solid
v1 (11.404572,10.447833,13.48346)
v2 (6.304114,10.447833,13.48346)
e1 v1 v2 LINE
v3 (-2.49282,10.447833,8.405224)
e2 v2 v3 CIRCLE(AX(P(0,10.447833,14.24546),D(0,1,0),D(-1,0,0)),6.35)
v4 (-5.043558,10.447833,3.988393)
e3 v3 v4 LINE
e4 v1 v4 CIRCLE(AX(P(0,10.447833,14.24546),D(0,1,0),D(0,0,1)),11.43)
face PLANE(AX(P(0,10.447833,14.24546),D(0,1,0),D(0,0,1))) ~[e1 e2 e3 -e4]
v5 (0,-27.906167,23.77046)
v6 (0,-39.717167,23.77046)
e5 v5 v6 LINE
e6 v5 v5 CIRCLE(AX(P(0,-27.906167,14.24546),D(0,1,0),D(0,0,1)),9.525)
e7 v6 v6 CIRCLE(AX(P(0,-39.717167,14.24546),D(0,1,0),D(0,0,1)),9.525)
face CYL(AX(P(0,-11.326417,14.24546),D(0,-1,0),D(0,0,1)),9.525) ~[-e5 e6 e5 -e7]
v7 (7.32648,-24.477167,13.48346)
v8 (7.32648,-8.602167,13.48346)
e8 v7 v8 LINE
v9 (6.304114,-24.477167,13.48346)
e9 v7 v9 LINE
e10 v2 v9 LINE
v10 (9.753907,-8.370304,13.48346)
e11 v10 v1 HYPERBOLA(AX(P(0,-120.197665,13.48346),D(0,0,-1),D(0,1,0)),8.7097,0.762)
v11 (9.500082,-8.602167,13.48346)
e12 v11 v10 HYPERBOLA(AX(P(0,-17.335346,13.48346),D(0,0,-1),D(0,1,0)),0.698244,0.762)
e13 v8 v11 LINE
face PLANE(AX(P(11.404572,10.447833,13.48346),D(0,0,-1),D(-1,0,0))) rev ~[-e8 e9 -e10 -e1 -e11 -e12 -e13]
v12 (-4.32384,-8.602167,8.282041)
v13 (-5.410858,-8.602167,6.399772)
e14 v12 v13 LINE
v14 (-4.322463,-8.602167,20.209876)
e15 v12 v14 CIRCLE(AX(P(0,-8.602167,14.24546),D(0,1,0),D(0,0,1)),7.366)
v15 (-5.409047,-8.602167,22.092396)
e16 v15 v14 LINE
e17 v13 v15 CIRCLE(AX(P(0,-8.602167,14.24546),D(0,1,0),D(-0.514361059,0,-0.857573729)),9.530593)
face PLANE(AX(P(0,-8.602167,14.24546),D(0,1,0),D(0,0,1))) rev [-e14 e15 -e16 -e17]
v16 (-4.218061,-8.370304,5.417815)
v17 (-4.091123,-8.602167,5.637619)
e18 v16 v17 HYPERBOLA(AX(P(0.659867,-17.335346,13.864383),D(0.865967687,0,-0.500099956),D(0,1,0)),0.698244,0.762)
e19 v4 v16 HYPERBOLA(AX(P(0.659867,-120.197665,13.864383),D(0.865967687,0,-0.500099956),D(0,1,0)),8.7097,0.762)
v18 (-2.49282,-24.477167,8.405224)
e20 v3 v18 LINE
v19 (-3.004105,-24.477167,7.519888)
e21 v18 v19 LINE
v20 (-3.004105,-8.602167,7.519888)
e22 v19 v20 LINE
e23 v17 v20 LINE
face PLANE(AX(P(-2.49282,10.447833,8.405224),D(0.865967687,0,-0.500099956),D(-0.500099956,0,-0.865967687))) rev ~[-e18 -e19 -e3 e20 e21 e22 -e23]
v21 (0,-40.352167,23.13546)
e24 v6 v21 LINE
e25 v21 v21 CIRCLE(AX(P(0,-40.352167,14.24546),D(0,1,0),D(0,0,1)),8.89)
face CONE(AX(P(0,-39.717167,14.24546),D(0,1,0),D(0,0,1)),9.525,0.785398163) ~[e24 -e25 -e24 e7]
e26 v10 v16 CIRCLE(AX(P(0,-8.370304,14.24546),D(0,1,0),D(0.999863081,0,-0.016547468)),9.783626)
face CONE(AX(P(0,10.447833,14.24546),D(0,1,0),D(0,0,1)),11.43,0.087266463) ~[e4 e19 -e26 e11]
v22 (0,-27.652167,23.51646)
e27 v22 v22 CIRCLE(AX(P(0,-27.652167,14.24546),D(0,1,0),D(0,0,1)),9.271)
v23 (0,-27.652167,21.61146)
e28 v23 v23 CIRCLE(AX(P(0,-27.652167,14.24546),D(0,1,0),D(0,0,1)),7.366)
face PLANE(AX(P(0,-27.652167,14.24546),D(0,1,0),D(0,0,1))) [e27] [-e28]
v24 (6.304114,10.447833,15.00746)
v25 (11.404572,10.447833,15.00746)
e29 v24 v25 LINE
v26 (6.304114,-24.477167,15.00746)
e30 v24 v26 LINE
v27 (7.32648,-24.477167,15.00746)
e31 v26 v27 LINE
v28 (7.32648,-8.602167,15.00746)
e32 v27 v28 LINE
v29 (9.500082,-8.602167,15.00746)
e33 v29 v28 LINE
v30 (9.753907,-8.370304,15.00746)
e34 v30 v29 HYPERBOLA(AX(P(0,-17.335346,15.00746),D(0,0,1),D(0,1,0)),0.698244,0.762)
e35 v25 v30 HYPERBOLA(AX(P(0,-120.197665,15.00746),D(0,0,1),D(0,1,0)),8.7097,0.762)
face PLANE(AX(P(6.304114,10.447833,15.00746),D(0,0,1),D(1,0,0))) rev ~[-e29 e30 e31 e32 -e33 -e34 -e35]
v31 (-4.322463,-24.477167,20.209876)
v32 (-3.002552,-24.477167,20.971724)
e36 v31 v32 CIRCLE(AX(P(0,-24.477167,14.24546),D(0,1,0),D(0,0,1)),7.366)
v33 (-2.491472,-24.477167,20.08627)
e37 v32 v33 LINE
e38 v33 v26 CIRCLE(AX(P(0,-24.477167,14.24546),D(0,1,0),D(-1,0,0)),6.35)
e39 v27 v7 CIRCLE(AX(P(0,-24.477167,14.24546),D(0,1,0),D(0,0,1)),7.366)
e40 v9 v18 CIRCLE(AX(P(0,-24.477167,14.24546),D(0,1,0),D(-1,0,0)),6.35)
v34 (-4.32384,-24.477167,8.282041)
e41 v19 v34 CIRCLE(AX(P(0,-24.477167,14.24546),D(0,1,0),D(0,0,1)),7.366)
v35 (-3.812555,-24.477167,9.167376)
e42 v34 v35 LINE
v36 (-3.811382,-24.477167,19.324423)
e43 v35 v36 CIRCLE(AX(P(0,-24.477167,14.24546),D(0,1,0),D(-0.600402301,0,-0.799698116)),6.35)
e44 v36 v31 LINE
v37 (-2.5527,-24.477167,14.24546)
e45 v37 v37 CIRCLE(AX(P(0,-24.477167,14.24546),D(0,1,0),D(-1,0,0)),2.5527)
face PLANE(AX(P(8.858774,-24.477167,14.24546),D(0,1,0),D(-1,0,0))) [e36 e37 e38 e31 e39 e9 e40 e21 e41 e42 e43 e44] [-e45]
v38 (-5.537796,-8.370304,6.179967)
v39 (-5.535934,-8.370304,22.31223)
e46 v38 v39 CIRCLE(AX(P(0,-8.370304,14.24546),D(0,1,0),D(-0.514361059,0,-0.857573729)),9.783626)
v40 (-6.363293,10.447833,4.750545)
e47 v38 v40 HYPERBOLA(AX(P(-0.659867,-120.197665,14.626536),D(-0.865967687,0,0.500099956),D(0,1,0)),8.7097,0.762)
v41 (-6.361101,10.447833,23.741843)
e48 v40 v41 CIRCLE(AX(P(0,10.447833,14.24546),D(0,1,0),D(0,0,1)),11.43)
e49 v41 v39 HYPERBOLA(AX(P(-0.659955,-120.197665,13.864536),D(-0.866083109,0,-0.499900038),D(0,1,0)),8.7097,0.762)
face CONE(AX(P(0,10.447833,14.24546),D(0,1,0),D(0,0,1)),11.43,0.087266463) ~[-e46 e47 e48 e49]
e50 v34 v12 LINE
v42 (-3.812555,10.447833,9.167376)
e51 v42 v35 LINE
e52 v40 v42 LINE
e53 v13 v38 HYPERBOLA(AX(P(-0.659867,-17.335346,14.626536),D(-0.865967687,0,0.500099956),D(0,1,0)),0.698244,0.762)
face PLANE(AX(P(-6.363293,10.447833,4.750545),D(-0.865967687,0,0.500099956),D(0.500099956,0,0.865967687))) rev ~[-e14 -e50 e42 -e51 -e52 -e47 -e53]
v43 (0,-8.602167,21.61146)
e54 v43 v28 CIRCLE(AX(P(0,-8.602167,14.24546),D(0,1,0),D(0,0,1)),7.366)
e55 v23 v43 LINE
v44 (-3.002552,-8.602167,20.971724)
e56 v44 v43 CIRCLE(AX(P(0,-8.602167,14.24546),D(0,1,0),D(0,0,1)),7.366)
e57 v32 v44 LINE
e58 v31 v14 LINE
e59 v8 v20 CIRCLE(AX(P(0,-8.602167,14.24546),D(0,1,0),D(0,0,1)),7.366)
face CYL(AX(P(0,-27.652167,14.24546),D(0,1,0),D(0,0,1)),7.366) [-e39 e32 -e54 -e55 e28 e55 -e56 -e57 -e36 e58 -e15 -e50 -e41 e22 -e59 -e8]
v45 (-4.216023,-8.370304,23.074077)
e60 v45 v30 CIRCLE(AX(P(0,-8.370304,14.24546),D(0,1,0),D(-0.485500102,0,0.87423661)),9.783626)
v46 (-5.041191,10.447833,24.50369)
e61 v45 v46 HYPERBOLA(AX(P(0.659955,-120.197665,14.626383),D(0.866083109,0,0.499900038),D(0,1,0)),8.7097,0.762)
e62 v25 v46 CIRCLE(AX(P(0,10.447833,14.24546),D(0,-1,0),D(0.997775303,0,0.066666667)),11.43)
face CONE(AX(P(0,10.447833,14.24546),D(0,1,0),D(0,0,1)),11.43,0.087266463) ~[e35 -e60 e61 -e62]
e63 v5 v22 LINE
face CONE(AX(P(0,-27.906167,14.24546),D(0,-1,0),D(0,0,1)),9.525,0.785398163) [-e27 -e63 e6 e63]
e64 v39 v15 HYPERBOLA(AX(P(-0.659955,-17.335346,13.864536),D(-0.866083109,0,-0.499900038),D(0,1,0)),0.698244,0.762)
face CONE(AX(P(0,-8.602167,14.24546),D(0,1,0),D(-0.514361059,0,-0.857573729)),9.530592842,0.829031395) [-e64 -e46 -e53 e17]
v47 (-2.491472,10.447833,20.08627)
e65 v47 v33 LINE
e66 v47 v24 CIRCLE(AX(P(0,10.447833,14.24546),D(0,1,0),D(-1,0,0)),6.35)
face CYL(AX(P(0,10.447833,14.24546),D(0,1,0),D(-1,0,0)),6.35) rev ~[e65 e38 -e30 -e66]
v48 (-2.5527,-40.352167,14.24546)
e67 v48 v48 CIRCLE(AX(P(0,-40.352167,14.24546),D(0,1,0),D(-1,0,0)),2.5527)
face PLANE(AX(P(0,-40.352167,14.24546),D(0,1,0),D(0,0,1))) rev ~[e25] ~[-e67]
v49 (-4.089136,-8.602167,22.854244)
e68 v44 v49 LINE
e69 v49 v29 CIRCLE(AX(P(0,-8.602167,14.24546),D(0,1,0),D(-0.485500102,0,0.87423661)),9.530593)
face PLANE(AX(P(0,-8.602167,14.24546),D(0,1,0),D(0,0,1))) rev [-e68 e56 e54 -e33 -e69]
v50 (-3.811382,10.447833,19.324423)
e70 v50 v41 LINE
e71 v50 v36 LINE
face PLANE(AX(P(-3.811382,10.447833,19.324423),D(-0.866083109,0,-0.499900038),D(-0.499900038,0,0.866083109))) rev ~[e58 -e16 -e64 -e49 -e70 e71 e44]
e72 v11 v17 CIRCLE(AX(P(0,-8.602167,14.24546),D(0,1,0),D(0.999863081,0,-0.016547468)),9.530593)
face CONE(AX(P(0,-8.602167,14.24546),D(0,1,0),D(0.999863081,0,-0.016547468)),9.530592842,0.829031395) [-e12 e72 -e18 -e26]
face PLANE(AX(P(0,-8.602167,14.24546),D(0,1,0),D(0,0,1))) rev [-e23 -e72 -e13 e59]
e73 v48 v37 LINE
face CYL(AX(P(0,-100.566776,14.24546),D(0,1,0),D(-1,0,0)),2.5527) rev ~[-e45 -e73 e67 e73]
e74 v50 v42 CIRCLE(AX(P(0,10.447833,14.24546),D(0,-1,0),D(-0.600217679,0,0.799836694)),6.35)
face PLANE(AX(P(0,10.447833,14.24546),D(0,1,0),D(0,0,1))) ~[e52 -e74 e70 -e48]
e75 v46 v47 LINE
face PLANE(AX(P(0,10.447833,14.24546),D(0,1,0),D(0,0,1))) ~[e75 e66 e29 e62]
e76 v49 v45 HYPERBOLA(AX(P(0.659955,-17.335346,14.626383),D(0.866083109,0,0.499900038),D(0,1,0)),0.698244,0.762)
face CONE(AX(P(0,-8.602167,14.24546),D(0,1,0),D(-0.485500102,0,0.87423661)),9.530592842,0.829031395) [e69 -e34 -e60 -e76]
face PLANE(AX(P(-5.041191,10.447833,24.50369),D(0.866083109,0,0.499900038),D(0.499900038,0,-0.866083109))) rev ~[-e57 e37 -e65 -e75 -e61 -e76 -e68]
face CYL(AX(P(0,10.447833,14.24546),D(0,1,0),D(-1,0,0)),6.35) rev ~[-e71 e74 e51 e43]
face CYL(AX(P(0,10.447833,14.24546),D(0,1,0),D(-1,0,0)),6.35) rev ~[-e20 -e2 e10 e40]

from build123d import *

# Parameters (mm, degrees)
F2_R         = 6.35
F3_DEPTH     = 34.925
F5_D         = 5.1054
F9_DEPTH     = 34.925
F10_SIZE     = 0.635
F11_T4_ANGLE = 118.0970990721
F11_T6_ANGLE = 118.1103265481
F11_T8_ANGLE = 118.1037128101


# Not quite as in the source:
# - a fillet or chamfer that OpenCascade refuses, or shapes differently, is made with other operations: its cross-section is extruded or revolved along the edge and cut away or added


with BuildPart() as f1:
    # F0 (on Right) → F1 (revolve)
    with BuildSketch(Plane.YZ):
        Polygon((-11.3264165741, 23.7704595025), (-40.3521669373, 23.7704595025), (-40.3521669373, 14.2454595025), (10.4478330627, 14.2454595025), (10.4478330627, 25.6754595025), align=None)
    revolve(axis=Axis((0, -14.9521669373, 14.2454595025), (0, 1, 0)))

    # F2 (on face) → F3 (cut)
    with BuildSketch(Plane(origin=(0, 10.4478330627, 0), x_dir=(-1, 0, 0), z_dir=(0, 1, 0))):
        with Locations((0, 14.2454595025)):
            Circle(F2_R)
    extrude(amount=-F3_DEPTH, mode=Mode.SUBTRACT)

    # F5 (through all)
    with Locations(Plane.XZ.offset(40.3521669373)):
        with Locations((0, 14.2454595025)):
            Hole(F5_D / 2)

    # F6 (on Right) → F7 (revolve, cut)
    with BuildSketch(Plane.YZ):
        Polygon((-11.3264165741, 23.7704595025), (-27.6521669373, 23.7704595025), (-27.6521669373, 21.6114595025), (-8.6021669373, 21.6114595025), (-8.6021669373, 24.0088004624), align=None)
    revolve(axis=Axis((0, -14.9521669373, 14.2454595025), (0, 1, 0)), mode=Mode.SUBTRACT)

    # F8 (on face) → F9 (cut)
    with BuildSketch(Plane(origin=(0, 10.4478330627, 0), x_dir=(-1, 0, 0), z_dir=(0, 1, 0))):
        with BuildLine():
            Line((-6.3041142122, 15.0074595025), (-11.4045717149, 15.0074595025))
            ThreePointArc((-11.4045717149, 15.0074595025), (-11.43, 14.2454595025), (-11.4045717149, 13.4834595025))
            Line((-11.4045717149, 13.4834595025), (-6.3041142122, 13.4834595025))
            ThreePointArc((-6.3041142122, 13.4834595025), (-6.35, 14.2454595025), (-6.3041142122, 15.0074595025))
        make_face()
        with BuildLine():
            Line((3.8113822624, 19.3244225118), (6.3611011609, 23.7418426046))
            ThreePointArc((6.3611011609, 23.7418426046), (5.7138574323, 24.1447894416), (5.0411905024, 24.5036902622))
            Line((5.0411905024, 24.5036902622), (2.4914716038, 20.0862701695))
            ThreePointArc((2.4914716038, 20.0862701695), (3.1743652402, 19.7450872465), (3.8113822624, 19.3244225118))
        make_face()
        with BuildLine():
            ThreePointArc((5.04355843, 3.9883927501), (5.7161424915, 4.347448843), (6.3632931846, 4.7505450823))
            Line((6.3632931846, 4.7505450823), (3.8125546144, 9.1673764673))
            ThreePointArc((3.8125546144, 9.1673764673), (3.1756347175, 8.7465646917), (2.4928198598, 8.4052241351))
            Line((2.4928198598, 8.4052241351), (5.04355843, 3.9883927501))
        make_face()
    extrude(amount=-F9_DEPTH, mode=Mode.SUBTRACT)

    # F10
    f10_edges = [f1.edges().sort_by_distance(p)[0] for p in [
        (0, -40.352167, 4.72046),
    ]]
    chamfer(f10_edges, length=F10_SIZE)

    # F11: chamfer of 0.254 on 4 edges, made by hand

    # F11_s1 → F11_t2 (revolve, cut)
    with BuildSketch(Plane.YZ):
        Polygon((-27.9061669373, 23.7704595025), (-27.6521669373, 23.5164595025), (-27.6521669373, 23.7704595025), align=None)
    revolve(axis=Axis((0, -27.6521669373, 14.2454595025), (0, 1, 0)), mode=Mode.SUBTRACT)

    # F11_s3 → F11_t4 (revolve, cut)
    with BuildSketch(Plane(origin=(6.0463708023, 0, 3.3578022312), x_dir=(0, 1, 0), z_dir=(-0.8742366104, 0, -0.485500102))):
        Polygon((-8.6021669373, -21.9844950709), (-8.3703044959, -22.2375285242), (-8.6021669373, -22.2172431891), align=None)
    revolve(axis=Axis((0, -8.6021669373, 14.2454595025), (0, 1, 0)), revolution_arc=F11_T4_ANGLE, mode=Mode.SUBTRACT)

    # F11_s5 → F11_t6 (revolve, cut)
    with BuildSketch(Plane(origin=(0.2356940066, 0, 14.2415588295), x_dir=(0, 1, 0), z_dir=(0.0165474678, 0, 0.9998630813))):
        Polygon((-8.6021669373, -9.2948665597), (-8.3703044959, -9.547900013), (-8.6021669373, -9.5276146779), align=None)
    revolve(axis=Axis((0, -8.6021669373, 14.2454595025), (0, 1, 0)), revolution_arc=F11_T6_ANGLE, mode=Mode.SUBTRACT)

    # F11_s7 → F11_t8 (revolve, cut)
    with BuildSketch(Plane(origin=(-6.2837082468, 0, 3.7688827395), x_dir=(0, 1, 0), z_dir=(0.8575737294, 0, -0.5143610587))):
        Polygon((-8.6021669373, 2.6859389904), (-8.3703044959, 2.4329055371), (-8.6021669373, 2.4531908722), align=None)
    revolve(axis=Axis((0, -8.6021669373, 14.2454595025), (0, 1, 0)), revolution_arc=F11_T8_ANGLE, mode=Mode.SUBTRACT)


solid = f1.part
